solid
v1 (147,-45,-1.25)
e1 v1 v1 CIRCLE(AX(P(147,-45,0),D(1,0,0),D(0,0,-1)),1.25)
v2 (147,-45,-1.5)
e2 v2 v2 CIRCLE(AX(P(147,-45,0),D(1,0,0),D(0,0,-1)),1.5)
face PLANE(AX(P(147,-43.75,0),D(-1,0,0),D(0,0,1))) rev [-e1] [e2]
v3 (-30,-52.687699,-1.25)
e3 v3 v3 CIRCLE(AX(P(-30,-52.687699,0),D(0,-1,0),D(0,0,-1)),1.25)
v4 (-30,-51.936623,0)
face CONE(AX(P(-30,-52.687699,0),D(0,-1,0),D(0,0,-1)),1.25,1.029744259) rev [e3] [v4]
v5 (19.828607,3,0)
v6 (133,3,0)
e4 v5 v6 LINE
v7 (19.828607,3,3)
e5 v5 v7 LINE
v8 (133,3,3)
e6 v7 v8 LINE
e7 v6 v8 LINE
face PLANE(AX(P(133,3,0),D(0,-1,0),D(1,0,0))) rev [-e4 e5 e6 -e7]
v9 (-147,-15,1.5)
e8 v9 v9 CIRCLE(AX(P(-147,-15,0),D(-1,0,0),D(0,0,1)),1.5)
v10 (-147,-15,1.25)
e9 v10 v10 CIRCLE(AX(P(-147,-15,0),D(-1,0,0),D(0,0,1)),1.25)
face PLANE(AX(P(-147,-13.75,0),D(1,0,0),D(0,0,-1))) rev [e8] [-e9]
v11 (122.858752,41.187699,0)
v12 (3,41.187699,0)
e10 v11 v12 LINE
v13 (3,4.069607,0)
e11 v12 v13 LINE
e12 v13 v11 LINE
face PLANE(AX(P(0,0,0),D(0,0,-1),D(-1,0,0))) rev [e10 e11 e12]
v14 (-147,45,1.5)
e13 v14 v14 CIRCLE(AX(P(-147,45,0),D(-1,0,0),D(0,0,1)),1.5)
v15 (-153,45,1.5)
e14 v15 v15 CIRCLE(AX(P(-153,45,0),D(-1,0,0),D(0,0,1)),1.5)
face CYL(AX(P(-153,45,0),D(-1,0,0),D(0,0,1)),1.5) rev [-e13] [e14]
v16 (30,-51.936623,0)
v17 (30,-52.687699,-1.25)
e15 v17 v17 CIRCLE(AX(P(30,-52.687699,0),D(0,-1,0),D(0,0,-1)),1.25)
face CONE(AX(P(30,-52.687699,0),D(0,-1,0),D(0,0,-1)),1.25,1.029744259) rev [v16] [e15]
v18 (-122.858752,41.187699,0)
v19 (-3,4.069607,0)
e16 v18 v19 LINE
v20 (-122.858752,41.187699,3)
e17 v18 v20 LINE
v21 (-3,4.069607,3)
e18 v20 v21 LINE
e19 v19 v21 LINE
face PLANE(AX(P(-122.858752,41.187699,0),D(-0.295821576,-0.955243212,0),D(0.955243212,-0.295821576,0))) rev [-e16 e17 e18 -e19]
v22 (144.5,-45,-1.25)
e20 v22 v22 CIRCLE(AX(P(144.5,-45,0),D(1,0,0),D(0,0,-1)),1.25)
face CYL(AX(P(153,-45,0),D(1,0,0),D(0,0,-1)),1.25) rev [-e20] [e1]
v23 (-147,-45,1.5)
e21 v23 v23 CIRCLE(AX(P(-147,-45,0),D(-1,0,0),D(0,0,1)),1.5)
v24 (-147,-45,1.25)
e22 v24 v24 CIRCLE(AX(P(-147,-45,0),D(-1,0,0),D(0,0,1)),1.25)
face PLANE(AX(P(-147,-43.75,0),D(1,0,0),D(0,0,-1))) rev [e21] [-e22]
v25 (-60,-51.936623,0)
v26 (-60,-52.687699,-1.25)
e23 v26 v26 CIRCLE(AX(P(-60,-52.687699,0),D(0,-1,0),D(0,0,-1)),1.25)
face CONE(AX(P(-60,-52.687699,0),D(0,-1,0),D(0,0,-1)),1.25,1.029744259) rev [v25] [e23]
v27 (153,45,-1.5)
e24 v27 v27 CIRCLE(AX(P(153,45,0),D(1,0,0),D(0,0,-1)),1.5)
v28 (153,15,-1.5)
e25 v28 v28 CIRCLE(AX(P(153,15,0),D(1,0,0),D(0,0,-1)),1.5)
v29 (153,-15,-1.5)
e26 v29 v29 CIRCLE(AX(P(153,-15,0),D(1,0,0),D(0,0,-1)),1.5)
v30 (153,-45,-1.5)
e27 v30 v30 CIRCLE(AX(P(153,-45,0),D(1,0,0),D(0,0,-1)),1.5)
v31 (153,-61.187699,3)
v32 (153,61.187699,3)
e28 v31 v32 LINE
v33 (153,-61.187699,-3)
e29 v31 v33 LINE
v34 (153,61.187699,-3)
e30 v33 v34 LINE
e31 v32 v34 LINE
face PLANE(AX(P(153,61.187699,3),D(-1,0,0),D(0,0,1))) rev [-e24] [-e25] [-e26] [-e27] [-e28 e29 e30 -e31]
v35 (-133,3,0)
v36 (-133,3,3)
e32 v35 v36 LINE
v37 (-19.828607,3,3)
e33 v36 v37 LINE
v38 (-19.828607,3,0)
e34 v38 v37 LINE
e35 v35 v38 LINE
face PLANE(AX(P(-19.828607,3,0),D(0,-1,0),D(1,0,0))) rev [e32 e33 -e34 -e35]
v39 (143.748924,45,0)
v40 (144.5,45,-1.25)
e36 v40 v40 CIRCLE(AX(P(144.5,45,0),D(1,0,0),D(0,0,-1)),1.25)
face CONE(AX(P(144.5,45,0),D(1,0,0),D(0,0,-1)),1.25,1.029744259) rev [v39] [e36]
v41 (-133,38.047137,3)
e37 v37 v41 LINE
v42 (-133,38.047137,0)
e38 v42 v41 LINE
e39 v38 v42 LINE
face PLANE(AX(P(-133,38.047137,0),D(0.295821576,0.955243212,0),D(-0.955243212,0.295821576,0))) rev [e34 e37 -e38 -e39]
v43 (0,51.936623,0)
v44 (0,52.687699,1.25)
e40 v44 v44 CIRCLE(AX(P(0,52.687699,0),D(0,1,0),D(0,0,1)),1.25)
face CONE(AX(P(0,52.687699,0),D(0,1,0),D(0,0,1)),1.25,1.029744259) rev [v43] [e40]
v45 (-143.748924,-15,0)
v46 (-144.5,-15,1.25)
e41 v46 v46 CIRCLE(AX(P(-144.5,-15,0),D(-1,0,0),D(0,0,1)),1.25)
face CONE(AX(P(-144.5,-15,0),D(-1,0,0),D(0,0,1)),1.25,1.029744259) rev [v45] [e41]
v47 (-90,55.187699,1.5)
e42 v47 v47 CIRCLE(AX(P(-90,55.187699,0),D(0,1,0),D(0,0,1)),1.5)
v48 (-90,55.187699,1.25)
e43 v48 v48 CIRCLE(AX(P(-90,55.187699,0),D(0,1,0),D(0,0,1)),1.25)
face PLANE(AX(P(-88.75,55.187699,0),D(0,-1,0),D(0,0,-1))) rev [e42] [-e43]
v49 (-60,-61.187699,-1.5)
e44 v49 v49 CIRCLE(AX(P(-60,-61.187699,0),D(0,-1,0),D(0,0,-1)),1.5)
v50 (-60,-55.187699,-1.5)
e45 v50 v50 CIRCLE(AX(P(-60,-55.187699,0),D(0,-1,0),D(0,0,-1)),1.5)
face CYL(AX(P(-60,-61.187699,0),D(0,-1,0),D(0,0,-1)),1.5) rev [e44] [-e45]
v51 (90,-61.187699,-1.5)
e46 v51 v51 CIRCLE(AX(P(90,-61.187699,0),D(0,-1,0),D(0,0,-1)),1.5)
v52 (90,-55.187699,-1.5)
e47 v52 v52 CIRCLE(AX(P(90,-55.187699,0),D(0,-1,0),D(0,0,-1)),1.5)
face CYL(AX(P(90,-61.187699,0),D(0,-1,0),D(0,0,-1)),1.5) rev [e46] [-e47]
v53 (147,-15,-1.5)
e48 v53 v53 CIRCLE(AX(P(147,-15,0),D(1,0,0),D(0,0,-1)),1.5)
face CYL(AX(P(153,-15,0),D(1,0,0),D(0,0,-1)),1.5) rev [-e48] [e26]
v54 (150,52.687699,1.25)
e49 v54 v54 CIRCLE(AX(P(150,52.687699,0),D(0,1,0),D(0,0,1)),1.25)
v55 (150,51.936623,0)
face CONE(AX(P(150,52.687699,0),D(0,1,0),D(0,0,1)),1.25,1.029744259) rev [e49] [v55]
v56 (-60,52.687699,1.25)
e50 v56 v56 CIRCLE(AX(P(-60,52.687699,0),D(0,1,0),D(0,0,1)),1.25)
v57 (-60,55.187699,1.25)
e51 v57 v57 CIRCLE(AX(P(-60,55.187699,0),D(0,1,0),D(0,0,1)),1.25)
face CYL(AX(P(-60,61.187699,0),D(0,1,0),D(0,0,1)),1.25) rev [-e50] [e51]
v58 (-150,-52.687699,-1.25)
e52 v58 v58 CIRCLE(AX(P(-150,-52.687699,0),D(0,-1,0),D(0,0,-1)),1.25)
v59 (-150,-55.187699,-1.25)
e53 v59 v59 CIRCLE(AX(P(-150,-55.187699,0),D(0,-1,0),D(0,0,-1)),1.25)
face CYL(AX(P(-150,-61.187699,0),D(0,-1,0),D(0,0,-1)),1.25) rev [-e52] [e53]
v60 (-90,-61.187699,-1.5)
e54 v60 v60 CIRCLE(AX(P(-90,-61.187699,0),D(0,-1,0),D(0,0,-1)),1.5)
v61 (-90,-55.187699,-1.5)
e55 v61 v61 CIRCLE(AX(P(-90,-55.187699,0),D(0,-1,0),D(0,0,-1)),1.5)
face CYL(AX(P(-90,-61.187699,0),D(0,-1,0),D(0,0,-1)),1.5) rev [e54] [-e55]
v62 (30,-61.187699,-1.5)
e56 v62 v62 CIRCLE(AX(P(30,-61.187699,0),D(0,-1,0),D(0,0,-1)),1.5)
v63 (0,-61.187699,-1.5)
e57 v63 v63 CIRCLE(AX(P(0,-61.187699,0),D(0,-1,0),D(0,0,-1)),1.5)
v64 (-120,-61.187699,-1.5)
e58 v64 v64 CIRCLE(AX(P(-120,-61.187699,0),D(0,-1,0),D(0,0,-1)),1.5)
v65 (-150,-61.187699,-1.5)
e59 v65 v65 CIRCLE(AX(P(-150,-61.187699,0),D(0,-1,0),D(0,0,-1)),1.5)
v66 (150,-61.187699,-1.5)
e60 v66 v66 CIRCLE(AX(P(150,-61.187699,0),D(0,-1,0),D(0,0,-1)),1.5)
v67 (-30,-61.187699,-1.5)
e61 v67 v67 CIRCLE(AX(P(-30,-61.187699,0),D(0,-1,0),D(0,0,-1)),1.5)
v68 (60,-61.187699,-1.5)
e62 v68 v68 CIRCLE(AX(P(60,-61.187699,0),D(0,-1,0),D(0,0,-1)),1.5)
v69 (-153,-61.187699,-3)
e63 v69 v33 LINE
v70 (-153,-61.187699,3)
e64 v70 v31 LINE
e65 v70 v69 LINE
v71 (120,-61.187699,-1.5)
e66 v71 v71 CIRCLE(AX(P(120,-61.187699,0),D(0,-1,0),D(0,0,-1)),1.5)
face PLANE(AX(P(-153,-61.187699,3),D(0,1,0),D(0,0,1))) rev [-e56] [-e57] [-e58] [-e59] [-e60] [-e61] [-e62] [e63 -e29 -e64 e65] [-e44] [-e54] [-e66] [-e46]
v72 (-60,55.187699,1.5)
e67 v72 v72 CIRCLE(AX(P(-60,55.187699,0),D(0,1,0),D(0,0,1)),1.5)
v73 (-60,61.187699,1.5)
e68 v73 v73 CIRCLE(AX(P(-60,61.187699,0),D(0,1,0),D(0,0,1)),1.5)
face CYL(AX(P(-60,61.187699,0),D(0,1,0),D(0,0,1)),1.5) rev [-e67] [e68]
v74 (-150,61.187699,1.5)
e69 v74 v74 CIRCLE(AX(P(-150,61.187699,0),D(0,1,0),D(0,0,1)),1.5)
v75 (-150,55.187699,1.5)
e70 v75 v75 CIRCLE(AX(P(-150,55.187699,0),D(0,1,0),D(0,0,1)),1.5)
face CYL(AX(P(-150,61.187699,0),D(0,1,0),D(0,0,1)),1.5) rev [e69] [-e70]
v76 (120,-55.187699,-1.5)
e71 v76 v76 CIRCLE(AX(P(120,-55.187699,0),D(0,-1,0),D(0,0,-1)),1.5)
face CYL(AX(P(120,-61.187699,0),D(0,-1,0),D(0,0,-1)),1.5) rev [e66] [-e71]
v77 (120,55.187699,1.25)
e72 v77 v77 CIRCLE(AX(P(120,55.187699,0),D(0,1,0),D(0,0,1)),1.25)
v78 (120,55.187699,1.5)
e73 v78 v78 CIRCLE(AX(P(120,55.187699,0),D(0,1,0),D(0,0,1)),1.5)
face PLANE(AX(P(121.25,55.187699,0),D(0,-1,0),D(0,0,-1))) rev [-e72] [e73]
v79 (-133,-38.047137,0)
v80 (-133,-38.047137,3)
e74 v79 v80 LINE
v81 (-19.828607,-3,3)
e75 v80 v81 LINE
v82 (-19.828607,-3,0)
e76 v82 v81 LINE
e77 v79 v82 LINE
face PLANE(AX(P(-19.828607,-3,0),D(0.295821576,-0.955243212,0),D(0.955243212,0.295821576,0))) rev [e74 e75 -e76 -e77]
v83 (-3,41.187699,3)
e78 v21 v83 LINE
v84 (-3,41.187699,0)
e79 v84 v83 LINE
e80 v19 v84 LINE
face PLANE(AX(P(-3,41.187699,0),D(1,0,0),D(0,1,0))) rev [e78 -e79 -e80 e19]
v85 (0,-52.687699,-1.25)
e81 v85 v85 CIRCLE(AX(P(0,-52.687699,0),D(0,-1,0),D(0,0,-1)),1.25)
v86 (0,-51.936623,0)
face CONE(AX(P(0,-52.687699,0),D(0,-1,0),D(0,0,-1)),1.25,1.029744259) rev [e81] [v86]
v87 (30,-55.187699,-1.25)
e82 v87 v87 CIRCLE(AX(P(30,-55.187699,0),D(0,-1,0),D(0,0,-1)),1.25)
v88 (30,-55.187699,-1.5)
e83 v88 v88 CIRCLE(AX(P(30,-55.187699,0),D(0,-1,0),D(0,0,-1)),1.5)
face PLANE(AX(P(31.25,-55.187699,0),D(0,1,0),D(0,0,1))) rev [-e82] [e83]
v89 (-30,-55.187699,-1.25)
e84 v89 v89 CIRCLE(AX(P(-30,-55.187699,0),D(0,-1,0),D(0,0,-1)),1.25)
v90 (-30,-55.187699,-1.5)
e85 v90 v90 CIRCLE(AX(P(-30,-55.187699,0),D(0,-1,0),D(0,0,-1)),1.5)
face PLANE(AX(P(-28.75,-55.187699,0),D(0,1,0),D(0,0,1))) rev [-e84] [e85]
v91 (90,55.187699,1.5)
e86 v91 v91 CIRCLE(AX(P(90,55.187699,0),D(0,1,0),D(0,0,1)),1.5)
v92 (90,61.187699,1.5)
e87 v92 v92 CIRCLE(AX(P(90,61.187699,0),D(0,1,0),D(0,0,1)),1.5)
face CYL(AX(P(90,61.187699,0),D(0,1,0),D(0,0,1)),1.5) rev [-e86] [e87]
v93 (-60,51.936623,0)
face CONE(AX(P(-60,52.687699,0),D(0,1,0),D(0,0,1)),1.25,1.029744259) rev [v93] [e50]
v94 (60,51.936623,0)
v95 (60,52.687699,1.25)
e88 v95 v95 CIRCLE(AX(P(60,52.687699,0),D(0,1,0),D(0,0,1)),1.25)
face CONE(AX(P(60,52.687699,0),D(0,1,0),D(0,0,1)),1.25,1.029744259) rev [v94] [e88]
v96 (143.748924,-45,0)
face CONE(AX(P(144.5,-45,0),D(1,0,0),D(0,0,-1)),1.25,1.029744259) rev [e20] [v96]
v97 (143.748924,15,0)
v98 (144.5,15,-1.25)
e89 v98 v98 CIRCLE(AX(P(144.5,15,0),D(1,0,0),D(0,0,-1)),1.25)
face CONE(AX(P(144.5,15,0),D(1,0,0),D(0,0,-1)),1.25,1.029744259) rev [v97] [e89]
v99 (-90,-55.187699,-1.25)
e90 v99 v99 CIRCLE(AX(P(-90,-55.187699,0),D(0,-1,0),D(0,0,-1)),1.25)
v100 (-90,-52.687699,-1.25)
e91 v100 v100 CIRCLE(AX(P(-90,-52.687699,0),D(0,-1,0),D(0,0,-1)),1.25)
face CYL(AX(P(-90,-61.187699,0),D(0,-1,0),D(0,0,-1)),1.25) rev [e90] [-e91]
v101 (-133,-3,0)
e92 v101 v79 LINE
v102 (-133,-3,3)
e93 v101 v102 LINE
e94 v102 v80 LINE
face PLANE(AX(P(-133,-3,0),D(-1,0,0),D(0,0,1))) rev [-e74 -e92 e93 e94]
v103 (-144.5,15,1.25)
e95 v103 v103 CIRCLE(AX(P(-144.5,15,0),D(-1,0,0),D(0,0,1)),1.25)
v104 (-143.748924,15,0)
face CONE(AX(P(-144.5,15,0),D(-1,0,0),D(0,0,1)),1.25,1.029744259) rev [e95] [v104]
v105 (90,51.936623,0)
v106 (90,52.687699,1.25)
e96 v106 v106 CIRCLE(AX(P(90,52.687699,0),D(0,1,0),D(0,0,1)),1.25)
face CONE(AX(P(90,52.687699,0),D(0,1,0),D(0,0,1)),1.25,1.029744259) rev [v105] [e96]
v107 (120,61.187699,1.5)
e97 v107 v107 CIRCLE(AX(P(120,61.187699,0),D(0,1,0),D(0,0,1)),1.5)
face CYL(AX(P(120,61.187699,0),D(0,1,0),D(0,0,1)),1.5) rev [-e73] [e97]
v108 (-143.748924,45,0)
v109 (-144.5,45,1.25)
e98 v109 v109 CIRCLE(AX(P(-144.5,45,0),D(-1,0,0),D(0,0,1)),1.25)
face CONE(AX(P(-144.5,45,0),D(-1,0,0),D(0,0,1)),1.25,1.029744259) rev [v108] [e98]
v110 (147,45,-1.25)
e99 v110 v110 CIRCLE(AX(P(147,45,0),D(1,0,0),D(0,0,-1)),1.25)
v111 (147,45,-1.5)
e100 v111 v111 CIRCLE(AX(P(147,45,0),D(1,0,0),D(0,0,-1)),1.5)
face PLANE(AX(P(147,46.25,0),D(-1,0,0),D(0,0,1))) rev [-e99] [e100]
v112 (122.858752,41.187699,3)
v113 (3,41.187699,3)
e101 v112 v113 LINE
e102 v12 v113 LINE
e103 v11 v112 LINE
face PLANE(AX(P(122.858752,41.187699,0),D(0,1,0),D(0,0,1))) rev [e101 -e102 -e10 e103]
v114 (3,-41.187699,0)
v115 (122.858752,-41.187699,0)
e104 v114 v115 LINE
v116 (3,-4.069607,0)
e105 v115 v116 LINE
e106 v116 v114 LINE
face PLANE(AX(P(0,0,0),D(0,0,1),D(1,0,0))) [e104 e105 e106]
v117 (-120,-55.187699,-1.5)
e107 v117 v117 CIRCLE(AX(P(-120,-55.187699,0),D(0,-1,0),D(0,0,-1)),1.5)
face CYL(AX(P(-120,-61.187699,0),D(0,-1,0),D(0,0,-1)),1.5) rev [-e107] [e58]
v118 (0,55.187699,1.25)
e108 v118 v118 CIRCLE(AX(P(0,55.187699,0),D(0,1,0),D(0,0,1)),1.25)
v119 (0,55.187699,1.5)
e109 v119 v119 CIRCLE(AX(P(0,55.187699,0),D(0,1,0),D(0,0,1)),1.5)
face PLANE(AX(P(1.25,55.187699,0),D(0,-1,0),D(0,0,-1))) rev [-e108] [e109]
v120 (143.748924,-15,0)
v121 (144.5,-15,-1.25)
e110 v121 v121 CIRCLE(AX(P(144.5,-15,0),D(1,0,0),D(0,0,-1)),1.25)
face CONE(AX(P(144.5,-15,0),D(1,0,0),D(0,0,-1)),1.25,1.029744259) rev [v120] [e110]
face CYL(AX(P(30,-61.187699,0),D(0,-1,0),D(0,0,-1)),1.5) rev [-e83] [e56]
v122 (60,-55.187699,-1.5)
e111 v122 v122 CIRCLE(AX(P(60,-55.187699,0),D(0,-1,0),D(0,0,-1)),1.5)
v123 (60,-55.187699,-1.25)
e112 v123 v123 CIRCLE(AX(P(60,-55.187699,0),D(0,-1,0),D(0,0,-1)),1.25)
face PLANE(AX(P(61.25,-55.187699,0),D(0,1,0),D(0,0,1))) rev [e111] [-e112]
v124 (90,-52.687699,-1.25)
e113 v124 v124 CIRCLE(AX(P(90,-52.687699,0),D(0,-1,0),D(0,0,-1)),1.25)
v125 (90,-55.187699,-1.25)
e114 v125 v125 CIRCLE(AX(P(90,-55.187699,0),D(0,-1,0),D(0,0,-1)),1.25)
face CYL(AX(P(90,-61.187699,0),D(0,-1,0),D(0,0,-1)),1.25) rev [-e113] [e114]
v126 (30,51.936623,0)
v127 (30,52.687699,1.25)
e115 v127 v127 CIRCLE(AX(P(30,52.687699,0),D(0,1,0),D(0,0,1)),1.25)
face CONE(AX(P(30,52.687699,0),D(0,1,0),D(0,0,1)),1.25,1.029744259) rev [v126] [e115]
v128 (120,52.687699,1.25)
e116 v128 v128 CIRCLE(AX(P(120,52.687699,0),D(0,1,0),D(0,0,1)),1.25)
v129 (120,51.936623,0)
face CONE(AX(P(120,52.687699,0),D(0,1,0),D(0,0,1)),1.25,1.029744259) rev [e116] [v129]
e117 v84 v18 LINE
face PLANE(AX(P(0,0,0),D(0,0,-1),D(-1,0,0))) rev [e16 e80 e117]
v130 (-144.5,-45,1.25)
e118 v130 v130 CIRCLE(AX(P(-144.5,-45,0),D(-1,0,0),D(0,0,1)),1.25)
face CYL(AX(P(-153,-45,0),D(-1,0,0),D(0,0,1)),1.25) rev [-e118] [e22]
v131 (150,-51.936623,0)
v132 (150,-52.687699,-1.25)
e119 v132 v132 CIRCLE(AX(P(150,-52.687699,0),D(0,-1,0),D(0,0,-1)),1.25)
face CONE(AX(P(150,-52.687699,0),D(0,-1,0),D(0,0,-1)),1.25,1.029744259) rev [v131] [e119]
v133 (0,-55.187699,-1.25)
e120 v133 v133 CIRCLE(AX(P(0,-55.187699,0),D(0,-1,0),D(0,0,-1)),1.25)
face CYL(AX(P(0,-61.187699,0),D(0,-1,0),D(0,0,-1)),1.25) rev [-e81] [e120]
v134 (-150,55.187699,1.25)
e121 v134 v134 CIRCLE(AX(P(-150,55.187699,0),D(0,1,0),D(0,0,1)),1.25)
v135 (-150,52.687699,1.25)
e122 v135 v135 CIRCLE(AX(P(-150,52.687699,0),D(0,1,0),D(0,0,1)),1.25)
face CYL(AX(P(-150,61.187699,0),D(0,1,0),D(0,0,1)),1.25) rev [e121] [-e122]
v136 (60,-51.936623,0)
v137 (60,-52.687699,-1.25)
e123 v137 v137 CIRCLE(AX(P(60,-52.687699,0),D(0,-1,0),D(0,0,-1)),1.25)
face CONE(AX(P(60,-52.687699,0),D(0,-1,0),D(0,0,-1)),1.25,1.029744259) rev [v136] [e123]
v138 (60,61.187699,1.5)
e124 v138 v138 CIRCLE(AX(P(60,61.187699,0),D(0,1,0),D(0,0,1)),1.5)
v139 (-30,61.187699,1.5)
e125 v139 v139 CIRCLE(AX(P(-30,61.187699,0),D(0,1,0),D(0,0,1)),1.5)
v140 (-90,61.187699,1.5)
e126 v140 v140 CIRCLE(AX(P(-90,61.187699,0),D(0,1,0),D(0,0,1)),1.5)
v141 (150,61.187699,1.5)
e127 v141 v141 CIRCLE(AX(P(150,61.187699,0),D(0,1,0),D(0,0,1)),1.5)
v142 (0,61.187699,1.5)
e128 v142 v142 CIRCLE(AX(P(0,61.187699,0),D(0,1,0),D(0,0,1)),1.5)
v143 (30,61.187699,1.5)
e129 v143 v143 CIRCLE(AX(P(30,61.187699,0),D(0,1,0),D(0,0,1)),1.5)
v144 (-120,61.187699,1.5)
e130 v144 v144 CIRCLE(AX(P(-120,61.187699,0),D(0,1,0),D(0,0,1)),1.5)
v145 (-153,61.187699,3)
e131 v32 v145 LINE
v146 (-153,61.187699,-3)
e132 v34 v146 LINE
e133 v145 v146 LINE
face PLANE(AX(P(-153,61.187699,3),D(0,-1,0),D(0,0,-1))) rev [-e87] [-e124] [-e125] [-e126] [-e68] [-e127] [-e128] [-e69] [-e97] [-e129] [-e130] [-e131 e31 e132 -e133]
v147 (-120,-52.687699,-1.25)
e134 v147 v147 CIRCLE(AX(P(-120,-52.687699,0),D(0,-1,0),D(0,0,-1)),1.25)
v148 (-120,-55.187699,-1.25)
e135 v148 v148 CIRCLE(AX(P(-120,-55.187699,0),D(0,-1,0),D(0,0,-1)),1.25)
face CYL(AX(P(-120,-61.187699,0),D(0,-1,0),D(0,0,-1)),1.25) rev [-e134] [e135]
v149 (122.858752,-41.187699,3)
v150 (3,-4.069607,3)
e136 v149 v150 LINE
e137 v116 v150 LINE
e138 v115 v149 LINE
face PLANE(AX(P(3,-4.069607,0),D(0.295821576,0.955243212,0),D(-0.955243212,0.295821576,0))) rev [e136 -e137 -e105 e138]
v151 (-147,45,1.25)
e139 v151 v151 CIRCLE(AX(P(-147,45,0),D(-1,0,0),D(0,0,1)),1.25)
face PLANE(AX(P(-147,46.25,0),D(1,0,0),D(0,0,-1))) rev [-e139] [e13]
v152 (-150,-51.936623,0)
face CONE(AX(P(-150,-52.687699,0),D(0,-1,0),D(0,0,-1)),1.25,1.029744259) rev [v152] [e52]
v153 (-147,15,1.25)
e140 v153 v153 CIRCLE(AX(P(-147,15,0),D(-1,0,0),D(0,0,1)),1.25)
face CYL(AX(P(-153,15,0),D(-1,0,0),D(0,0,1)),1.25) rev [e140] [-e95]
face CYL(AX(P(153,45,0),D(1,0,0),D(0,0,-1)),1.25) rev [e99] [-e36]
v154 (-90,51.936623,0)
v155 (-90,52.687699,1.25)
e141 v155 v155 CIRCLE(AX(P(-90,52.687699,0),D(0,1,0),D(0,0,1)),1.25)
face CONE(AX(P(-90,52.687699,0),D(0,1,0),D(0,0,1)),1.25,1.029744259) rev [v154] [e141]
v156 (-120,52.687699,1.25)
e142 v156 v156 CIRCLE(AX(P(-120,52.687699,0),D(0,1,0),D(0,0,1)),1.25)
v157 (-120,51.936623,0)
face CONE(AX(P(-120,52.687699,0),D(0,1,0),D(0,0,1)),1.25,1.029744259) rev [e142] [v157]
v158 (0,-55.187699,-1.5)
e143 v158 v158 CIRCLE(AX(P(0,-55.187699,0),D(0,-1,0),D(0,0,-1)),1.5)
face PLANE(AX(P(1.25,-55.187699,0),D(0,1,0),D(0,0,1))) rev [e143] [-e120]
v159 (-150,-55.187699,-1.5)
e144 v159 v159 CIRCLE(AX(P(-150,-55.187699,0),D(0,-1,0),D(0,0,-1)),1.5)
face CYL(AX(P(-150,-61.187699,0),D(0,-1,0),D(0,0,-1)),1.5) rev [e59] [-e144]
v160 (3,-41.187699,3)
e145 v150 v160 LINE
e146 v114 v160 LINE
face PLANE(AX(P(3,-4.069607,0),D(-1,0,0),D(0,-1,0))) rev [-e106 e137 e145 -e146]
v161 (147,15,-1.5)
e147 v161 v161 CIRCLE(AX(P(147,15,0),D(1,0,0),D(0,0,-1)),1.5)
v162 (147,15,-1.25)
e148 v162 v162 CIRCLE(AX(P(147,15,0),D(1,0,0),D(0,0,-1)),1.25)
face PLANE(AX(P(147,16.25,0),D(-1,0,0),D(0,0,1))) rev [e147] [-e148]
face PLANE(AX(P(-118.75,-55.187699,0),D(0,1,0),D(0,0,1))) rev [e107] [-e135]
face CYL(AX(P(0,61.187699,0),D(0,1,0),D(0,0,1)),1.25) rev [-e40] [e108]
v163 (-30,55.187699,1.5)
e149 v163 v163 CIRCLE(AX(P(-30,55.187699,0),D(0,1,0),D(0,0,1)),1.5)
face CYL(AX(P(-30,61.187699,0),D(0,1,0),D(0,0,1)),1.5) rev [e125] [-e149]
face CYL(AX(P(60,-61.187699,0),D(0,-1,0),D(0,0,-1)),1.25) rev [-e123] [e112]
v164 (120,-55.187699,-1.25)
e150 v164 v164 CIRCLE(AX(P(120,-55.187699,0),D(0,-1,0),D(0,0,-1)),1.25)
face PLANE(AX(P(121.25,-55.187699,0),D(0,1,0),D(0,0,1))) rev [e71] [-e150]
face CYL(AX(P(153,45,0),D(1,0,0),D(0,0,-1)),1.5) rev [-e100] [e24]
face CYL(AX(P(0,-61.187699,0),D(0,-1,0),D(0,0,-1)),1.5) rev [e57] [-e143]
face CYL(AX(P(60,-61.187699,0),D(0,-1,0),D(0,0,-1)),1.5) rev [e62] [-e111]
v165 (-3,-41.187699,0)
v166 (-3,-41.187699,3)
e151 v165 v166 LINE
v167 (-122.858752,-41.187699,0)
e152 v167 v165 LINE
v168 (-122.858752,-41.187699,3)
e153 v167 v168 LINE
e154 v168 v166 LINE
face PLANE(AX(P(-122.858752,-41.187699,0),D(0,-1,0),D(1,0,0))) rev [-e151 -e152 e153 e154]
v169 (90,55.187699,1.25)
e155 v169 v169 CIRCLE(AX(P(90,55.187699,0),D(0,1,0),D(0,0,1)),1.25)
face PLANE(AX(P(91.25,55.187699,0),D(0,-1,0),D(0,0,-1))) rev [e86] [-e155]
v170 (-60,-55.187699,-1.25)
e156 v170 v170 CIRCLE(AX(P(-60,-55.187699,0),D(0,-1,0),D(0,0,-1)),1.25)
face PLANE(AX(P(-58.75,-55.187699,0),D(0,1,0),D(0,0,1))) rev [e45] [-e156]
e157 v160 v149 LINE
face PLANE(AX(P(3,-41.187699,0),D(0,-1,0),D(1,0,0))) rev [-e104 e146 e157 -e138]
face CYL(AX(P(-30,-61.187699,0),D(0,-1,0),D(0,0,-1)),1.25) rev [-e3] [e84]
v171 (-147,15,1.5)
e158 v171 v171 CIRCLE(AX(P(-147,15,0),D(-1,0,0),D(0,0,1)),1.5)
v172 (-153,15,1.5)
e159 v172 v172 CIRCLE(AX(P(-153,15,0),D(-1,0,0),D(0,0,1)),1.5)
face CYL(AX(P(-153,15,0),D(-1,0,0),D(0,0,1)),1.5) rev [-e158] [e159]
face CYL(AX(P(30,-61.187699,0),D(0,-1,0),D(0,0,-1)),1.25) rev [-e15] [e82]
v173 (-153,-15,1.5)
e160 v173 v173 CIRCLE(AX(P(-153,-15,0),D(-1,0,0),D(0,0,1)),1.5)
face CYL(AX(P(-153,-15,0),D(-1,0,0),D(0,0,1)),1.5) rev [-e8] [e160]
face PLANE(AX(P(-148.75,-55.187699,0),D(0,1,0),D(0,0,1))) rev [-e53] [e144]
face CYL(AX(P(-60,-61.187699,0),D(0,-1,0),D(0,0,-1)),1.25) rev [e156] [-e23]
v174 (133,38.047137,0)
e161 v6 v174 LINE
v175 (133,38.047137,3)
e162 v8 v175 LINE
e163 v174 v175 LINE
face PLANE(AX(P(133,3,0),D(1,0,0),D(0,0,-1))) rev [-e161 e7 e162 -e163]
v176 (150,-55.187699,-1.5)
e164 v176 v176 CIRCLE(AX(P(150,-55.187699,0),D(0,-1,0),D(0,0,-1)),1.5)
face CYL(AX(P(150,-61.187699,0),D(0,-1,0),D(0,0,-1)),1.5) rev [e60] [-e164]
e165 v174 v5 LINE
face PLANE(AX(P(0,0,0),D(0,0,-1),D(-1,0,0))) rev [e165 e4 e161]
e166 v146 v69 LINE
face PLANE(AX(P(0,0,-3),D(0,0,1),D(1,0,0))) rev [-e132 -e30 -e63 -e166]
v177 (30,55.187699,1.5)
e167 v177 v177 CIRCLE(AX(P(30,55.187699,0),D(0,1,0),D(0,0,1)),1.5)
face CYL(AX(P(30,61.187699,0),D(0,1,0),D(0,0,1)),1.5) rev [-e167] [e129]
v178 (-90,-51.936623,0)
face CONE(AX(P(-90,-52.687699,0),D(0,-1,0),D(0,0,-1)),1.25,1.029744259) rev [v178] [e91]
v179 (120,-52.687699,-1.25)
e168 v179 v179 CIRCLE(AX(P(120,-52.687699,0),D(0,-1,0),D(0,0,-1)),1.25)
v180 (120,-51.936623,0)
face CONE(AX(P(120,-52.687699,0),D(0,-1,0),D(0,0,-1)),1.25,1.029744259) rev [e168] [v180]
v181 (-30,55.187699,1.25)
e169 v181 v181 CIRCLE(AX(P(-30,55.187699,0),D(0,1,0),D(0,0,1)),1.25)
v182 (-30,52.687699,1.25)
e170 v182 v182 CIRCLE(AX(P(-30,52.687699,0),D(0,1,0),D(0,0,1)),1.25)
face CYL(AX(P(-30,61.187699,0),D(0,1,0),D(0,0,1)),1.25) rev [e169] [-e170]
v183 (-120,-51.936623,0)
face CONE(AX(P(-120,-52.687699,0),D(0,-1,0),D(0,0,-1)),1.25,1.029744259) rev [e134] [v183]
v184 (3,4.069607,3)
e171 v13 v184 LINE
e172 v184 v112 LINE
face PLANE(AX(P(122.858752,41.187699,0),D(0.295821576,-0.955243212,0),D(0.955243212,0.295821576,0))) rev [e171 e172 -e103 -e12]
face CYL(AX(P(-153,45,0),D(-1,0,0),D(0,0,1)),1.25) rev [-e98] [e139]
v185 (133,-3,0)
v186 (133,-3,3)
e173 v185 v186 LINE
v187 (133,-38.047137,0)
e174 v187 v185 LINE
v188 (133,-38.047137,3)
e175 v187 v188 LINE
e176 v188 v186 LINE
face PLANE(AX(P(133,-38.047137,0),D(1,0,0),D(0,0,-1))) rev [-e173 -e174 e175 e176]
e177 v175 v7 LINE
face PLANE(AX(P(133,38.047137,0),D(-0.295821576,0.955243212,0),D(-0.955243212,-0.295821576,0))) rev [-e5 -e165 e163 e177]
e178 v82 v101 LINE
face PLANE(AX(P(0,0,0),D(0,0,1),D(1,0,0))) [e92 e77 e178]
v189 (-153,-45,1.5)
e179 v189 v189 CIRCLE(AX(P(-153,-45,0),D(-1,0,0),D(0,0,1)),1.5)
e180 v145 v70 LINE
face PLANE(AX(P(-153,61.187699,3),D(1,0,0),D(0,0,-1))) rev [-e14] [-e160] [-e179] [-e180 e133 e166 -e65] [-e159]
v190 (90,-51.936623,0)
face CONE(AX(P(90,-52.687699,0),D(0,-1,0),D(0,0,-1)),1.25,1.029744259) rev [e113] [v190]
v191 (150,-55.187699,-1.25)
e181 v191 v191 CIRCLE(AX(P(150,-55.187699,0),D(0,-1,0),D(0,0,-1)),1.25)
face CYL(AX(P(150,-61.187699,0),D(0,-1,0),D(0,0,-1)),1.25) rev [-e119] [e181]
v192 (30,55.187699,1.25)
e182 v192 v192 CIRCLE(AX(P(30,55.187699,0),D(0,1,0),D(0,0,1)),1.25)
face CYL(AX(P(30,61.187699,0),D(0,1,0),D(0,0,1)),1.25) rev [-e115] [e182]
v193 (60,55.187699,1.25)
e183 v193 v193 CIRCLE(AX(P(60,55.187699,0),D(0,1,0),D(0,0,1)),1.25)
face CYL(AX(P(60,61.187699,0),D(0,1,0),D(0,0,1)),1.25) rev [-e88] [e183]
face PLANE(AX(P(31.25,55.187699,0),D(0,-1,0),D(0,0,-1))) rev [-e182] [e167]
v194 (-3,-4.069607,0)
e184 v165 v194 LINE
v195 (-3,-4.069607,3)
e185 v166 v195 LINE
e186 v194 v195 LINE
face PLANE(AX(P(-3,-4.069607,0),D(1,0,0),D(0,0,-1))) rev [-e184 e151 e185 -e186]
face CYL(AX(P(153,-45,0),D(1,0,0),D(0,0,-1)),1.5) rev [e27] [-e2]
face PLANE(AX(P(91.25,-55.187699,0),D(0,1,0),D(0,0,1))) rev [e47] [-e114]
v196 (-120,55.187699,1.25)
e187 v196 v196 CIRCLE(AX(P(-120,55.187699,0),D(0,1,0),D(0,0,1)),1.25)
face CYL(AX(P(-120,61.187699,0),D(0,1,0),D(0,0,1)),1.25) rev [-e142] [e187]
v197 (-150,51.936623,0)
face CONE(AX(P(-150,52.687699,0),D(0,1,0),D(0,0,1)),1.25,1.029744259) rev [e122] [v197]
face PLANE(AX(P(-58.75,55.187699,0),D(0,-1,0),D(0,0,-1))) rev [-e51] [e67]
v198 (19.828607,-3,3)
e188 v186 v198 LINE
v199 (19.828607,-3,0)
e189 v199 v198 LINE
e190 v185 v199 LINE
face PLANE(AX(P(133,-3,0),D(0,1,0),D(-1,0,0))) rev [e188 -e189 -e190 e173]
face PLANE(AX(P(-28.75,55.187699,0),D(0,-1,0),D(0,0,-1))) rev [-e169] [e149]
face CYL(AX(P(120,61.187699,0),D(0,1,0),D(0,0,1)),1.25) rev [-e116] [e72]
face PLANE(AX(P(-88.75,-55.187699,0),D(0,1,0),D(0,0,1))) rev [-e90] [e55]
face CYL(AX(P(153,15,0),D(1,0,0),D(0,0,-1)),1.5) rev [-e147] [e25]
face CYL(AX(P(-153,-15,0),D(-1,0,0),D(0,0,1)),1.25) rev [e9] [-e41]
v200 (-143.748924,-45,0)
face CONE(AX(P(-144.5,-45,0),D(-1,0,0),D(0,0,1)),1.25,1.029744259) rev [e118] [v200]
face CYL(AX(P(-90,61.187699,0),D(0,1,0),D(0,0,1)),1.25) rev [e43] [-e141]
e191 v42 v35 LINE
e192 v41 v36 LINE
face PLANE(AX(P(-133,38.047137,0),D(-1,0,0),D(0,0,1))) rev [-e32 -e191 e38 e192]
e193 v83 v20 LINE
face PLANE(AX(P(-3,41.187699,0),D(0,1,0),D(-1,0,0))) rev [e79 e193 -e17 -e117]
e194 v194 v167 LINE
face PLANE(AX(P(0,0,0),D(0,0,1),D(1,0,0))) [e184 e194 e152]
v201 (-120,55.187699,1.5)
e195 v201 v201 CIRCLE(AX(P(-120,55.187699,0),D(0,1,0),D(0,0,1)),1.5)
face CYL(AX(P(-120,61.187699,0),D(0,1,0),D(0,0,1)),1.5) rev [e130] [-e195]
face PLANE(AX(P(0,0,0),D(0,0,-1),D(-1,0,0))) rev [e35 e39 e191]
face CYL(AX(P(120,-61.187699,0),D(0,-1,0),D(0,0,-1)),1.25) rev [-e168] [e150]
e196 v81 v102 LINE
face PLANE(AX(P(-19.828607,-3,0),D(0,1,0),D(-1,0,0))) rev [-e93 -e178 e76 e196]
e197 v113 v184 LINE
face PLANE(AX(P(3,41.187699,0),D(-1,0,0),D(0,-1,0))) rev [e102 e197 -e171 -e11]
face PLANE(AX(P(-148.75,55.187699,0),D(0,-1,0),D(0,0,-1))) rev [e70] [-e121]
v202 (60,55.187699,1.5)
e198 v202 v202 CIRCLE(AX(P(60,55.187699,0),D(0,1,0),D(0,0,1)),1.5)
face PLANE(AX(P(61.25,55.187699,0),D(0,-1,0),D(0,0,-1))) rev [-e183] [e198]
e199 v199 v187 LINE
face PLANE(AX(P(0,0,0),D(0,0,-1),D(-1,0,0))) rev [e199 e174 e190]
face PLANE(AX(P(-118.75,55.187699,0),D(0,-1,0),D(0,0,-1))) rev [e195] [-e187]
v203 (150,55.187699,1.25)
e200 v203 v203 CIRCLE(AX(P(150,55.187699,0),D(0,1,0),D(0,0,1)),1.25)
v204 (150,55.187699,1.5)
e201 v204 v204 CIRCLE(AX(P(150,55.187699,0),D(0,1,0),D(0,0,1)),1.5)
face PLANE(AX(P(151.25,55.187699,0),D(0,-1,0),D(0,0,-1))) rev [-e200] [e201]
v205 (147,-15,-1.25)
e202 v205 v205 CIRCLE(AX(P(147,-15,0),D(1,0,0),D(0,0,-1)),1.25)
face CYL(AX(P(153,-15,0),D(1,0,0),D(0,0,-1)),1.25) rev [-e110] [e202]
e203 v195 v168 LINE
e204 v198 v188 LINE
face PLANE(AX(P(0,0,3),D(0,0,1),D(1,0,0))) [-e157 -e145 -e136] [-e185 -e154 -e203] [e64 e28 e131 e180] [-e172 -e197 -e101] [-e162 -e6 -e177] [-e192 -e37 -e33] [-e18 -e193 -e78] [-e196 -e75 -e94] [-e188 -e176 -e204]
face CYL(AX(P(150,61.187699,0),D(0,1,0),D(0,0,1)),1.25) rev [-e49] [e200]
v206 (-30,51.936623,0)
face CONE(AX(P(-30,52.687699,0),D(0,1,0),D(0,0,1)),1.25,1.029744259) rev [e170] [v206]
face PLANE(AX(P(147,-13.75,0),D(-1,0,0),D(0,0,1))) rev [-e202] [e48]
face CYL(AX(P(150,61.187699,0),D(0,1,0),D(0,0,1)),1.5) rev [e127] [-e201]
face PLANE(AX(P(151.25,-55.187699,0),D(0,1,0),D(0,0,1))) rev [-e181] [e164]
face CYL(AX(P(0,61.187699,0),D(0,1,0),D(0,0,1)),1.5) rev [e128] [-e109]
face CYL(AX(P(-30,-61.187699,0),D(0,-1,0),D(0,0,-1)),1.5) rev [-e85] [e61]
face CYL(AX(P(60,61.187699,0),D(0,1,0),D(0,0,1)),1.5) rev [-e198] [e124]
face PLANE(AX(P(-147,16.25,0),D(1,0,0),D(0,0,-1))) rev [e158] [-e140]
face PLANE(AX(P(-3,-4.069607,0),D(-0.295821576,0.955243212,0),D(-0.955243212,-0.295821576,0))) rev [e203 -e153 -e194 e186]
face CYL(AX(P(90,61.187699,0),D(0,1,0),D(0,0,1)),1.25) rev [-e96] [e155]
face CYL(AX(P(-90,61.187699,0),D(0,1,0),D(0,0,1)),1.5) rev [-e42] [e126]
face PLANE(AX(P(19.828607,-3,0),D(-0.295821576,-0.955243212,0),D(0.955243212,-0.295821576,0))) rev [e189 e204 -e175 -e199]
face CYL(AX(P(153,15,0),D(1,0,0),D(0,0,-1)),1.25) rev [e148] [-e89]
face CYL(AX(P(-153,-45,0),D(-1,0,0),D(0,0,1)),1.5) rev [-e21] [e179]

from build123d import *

# Parameters (mm, degrees)
SKETCH_1_W                     = 306
SKETCH_1_H                     = 122.375397488
EXTRUDE_1_DEPTH                = 3
M3X0_5_2_D                     = 2.5
M3X0_5_2_DEPTH                 = 8.5
M3X0_5_2_CBORE_D               = 3
M3X0_5_2_CBORE_DEPTH           = 6
M3X0_5_2_TIP                   = 0.751075774
M3X0_5_2_ON_FACE_2_D           = 2.5
M3X0_5_2_ON_FACE_2_DEPTH       = 8.5
M3X0_5_2_ON_FACE_2_CBORE_D     = 3
M3X0_5_2_ON_FACE_2_CBORE_DEPTH = 6
M3X0_5_2_ON_FACE_2_TIP         = 0.751075774
PATTERN_LINEAR_1_COUNT         = 11
PATTERN_LINEAR_1_PITCH         = 30
CUT_EXTRUDE_1_DEPTH            = 3


# Read off the part's stored shape, not the designer's step: M3x0.5 ねじ穴1
with BuildPart() as part:
    # ｽｹｯﾁ1 → ﾎﾞｽ - 押し出し1 (new, symmetric)
    with BuildSketch(Plane.XY):
        Rectangle(SKETCH_1_W, SKETCH_1_H)
    extrude(amount=EXTRUDE_1_DEPTH, both=True)

    # M3x0.5 ねじ穴1 outline → M3x0.5 ねじ穴1 (revolve, cut)
    with BuildSketch(Plane(origin=(-150, 0, 0), x_dir=(1, 0, 0), z_dir=(0, 0, 1))):
        Polygon((1.25, -52.687698744), (0, -51.93662297), (0, -61.187698744), (1.5, -61.187698744), (1.5, -55.187698744), (1.25, -55.187698744), align=None)
        Polygon((0, 61.187698744), (0, 51.93662297), (1.25, 52.687698744), (1.25, 55.187698744), (1.5, 55.187698744), (1.5, 61.187698744), align=None)
    m3x0_5_1 = revolve(axis=Axis((-150, 0, 0), (0, 1, 0)), mode=Mode.SUBTRACT)

    # M3x0.5 ねじ穴2
    with Locations(Plane(origin=(-153, 45, 0), x_dir=(0, 0, -1), z_dir=(-1, 0, 0))):
        with Locations((0, 0), (0, 30), (0, 60), (0, 90)):
            CounterBoreHole(M3X0_5_2_D / 2, M3X0_5_2_CBORE_D / 2, M3X0_5_2_CBORE_DEPTH, depth=M3X0_5_2_DEPTH)
            with Locations((0, 0, -(M3X0_5_2_DEPTH + M3X0_5_2_TIP / 2))):  # 118° drill point
                Cone(0, M3X0_5_2_D / 2, M3X0_5_2_TIP, mode=Mode.SUBTRACT)

    # M3x0.5 ねじ穴2 on face 2
    with Locations(Plane(origin=(153, -15, 0), x_dir=(0, 0, 1), z_dir=(1, 0, 0))):
        with Locations((0, 0), (0, -30), (0, -60), (0, 30)):
            CounterBoreHole(M3X0_5_2_ON_FACE_2_D / 2, M3X0_5_2_ON_FACE_2_CBORE_D / 2, M3X0_5_2_ON_FACE_2_CBORE_DEPTH, depth=M3X0_5_2_ON_FACE_2_DEPTH)
            with Locations((0, 0, -(M3X0_5_2_ON_FACE_2_DEPTH + M3X0_5_2_ON_FACE_2_TIP / 2))):  # 118° drill point
                Cone(0, M3X0_5_2_ON_FACE_2_D / 2, M3X0_5_2_ON_FACE_2_TIP, mode=Mode.SUBTRACT)

    # 直線ﾊﾟﾀｰﾝ1: M3x0.5 ねじ穴1 ×11
    with Locations(*[(i * PATTERN_LINEAR_1_PITCH, 0, 0) for i in range(1, PATTERN_LINEAR_1_COUNT)]):
        add(m3x0_5_1, mode=Mode.SUBTRACT)

    # ｽｹｯﾁ5 → ｶｯﾄ - 押し出し1 (cut)
    with BuildSketch(Plane.XY.offset(3)):
        Polygon((133, 3), (133, 38.047137303), (19.828606516, 3), align=None)
        Polygon((-3, 41.187698744), (-122.858751899, 41.187698744), (-3, 4.069607278), align=None)
        Polygon((-133, 38.047137303), (-133, 3), (-19.828606516, 3), align=None)
        Polygon((-122.858751899, -41.187698744), (-3, -41.187698744), (-3, -4.069607278), align=None)
        Polygon((133, -38.047137303), (133, -3), (19.828606516, -3), align=None)
        Polygon((122.858751899, 41.187698744), (3, 41.187698744), (3, 4.069607278), align=None)
        Polygon((-133, -3), (-133, -38.047137303), (-19.828606516, -3), align=None)
        Polygon((3, -41.187698744), (122.858751899, -41.187698744), (3, -4.069607278), align=None)
    extrude(amount=-CUT_EXTRUDE_1_DEPTH, mode=Mode.SUBTRACT)


solid = part.part
